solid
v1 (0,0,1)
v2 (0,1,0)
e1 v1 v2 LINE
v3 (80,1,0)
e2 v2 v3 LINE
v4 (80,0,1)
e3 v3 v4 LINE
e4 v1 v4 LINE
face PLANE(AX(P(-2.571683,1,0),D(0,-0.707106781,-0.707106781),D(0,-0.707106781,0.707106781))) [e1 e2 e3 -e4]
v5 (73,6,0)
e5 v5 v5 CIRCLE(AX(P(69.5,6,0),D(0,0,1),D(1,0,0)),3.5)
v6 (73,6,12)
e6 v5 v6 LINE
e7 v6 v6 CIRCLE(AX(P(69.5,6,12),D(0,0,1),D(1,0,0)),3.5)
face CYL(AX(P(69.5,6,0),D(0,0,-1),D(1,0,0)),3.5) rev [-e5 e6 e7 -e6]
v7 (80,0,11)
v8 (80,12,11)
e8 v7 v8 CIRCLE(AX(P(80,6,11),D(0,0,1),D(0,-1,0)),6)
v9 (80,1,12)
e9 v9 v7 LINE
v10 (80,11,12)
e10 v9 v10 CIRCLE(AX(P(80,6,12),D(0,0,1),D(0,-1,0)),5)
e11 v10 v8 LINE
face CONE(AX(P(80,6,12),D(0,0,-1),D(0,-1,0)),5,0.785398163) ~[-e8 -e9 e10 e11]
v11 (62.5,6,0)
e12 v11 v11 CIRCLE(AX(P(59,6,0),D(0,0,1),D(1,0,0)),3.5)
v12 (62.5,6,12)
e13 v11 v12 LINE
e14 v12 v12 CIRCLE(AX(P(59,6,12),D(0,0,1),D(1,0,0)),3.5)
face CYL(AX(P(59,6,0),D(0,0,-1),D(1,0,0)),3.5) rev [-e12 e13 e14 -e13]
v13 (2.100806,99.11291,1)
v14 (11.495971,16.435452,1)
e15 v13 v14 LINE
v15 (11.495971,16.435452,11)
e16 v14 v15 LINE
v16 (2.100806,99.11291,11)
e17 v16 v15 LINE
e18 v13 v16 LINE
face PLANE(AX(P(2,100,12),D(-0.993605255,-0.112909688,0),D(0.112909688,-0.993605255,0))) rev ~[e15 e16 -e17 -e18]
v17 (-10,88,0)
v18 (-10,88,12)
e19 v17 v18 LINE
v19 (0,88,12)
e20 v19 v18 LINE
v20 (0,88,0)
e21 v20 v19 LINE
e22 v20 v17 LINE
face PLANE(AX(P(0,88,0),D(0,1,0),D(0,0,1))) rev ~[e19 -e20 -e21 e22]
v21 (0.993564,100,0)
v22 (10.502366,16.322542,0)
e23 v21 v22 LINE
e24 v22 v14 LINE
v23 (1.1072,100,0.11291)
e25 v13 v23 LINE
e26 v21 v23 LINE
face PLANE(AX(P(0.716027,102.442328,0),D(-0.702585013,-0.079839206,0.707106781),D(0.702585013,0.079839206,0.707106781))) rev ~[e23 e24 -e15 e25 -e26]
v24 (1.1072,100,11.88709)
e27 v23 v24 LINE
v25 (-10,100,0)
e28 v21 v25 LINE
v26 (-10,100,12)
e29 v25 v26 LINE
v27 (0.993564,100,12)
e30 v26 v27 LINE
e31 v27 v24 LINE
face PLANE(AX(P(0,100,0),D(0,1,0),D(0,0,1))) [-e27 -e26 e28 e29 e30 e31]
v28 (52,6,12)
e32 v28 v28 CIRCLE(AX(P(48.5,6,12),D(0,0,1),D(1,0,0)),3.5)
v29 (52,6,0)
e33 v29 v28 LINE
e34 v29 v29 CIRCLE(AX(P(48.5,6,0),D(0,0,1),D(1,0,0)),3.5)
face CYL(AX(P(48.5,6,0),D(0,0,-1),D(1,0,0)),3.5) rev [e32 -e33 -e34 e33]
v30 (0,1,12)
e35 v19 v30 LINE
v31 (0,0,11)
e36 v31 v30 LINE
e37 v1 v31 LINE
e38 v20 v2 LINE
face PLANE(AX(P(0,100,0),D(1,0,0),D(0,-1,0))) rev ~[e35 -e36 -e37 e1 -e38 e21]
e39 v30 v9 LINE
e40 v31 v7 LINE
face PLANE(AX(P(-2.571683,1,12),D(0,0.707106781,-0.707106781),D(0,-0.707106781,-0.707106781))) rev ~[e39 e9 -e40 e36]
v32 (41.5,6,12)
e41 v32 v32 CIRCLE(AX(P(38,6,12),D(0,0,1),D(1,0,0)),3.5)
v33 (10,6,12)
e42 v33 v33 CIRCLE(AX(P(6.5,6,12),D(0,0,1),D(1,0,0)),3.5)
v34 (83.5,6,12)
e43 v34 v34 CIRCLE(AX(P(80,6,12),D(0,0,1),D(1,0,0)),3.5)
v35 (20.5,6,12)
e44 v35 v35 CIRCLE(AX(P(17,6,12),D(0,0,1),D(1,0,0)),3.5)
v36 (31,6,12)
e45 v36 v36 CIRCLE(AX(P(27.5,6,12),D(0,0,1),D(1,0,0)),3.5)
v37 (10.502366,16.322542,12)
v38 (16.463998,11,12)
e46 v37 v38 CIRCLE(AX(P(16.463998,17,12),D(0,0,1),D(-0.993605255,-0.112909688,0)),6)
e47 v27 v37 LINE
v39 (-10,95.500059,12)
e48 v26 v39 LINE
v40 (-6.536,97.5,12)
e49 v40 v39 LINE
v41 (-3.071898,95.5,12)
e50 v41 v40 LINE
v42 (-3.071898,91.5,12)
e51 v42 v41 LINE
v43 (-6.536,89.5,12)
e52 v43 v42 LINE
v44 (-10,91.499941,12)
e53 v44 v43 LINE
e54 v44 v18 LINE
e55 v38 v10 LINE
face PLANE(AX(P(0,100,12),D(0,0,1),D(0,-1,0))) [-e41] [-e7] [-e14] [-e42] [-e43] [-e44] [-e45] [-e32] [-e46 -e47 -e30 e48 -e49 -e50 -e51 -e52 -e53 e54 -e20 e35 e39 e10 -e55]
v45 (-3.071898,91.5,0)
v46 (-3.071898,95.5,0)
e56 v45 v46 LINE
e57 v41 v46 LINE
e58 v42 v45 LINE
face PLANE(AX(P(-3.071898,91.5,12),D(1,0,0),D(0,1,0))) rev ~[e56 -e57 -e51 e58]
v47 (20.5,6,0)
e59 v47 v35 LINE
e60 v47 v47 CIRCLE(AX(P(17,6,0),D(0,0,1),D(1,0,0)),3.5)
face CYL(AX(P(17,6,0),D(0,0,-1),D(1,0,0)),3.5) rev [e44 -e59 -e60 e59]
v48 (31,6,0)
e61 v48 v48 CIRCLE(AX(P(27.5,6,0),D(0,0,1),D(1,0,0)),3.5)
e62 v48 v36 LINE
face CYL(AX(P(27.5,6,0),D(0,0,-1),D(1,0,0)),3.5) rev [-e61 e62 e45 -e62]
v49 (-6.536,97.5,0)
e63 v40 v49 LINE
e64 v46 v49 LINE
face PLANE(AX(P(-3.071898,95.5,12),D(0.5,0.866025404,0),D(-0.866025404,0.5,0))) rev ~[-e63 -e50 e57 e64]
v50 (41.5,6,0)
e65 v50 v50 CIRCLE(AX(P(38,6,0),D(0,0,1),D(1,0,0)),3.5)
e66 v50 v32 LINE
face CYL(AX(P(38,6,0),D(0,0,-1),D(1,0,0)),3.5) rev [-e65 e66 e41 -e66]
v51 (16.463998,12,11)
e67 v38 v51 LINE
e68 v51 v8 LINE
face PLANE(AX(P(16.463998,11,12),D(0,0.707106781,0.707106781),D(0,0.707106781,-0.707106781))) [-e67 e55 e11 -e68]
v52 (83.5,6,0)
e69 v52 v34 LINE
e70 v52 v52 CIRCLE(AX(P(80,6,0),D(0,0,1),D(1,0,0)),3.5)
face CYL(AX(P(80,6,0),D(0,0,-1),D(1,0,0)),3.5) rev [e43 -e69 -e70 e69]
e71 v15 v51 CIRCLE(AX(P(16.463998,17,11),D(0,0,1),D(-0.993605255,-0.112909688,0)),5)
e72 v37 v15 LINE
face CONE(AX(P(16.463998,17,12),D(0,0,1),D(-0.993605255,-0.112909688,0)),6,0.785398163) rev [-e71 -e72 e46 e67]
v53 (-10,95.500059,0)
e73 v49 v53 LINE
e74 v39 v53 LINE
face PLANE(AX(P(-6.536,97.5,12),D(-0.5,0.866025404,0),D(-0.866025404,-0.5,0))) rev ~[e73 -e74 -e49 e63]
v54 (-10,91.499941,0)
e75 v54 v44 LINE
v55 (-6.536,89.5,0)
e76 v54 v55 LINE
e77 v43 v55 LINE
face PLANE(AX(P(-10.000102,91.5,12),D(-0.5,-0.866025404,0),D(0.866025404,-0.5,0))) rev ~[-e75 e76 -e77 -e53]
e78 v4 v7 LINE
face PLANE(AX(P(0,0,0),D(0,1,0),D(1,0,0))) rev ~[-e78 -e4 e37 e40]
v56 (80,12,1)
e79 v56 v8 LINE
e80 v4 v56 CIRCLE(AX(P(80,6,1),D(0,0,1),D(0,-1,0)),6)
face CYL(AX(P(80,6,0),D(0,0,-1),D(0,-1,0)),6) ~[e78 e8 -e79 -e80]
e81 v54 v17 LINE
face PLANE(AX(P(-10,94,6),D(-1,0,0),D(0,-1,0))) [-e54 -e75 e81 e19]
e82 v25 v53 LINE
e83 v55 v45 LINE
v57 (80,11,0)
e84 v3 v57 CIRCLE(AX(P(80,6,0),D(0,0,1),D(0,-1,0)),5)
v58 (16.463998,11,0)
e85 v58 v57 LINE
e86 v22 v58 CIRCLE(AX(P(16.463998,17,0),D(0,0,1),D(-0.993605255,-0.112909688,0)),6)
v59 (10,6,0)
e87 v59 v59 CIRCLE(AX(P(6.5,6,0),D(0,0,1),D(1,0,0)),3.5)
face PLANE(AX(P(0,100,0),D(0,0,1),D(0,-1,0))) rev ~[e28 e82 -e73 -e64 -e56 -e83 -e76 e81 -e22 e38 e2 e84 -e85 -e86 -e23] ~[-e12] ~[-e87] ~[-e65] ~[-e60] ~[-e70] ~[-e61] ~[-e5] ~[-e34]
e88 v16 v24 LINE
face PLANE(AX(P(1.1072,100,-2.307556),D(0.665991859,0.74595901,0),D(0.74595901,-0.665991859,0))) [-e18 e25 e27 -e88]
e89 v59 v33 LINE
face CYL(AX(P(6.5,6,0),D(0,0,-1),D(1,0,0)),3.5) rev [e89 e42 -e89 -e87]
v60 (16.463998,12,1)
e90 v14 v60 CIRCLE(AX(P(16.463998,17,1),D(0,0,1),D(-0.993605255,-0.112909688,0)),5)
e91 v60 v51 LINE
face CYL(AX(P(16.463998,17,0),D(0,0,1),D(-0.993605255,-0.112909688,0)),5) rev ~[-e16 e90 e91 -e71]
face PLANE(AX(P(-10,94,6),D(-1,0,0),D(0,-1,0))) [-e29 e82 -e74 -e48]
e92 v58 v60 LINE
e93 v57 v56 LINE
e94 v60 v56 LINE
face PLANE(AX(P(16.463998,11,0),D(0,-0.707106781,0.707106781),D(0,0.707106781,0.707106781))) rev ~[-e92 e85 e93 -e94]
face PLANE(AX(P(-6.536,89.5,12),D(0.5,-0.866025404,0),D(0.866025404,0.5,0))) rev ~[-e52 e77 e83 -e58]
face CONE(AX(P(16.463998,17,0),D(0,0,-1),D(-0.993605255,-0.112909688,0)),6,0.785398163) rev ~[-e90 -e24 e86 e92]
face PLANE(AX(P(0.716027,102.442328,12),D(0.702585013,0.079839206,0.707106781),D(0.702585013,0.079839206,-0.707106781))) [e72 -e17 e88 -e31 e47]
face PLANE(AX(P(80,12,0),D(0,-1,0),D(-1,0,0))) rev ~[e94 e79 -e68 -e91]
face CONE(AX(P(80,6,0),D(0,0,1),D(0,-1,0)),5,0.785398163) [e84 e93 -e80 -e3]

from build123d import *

# Parameters (mm, degrees)
F0_R         = 3.5
F1_DEPTH     = 12
F3_DEPTH     = 25
F4_R         = 5
F5_W         = 12
F5_H         = 12
F6_DEPTH     = 10
F8_T1_DEPTH  = 86.6740446023
F8_T3_DEPTH  = 16.6151120325
F8_T5_DEPTH  = 82.571682988
F8_T7_DEPTH  = 63.5360023124
F8_T10_ANGLE = 180
F8_T12_ANGLE = 83.5169263071
F8_T14_ANGLE = 180
F8_T16_ANGLE = 83.5169263071
F9_DEPTH     = 25


# Not quite as in the source:
# - a fillet or chamfer that OpenCascade refuses, or shapes differently, is made with other operations: its cross-section is extruded or revolved along the edge and cut away or added


with BuildPart() as f1:
    # F0 (on Top) → F1 (new body)
    with BuildSketch(Plane.XY):
        with BuildLine():
            Line((12, 100), (0, 100))
            Line((0, 100), (0, 0))
            Line((0, 0), (80, 0))
            ThreePointArc((80, 0), (86, 6), (80, 12))
            Line((80, 12), (12, 12))
            Line((12, 12), (12, 100))
        make_face()
        with Locations((6.5, 6)):
            Circle(F0_R, mode=Mode.SUBTRACT)
        with Locations((17, 6)):
            Circle(F0_R, mode=Mode.SUBTRACT)
        with Locations((27.5, 6)):
            Circle(F0_R, mode=Mode.SUBTRACT)
        with Locations((38, 6)):
            Circle(F0_R, mode=Mode.SUBTRACT)
        with Locations((48.5, 6)):
            Circle(F0_R, mode=Mode.SUBTRACT)
        with Locations((59, 6)):
            Circle(F0_R, mode=Mode.SUBTRACT)
        with Locations((69.5, 6)):
            Circle(F0_R, mode=Mode.SUBTRACT)
        with Locations((80, 6)):
            Circle(F0_R, mode=Mode.SUBTRACT)
    extrude(amount=F1_DEPTH)

    # F2 (on face) → F3 (cut)
    with BuildSketch(Plane.XY.offset(12)):
        Polygon((2, 100), (12, 12), (12, 100), align=None)
    extrude(amount=-F3_DEPTH, mode=Mode.SUBTRACT)

    # F4
    f4_edges = [f1.edges().sort_by_distance(p)[0] for p in [
        (12, 12, 6),
    ]]
    fillet(f4_edges, radius=F4_R)

    # F5 (on face) → F6 (join)
    with BuildSketch(Plane(origin=(0, 0, 0), x_dir=(0, -1, 0), z_dir=(-1, 0, 0))):
        with Locations((-94, 6)):
            Rectangle(F5_W, F5_H)
    extrude(amount=F6_DEPTH)

    # F8: chamfer of 1 on 11 edges, made by hand

    # F8_s2 → F8_t1 (cut)
    with BuildSketch(Plane(origin=(-11.4836366644, 101.0560026464, 0), x_dir=(0, 0, 1), z_dir=(0.112909688, -0.9936052548, 0))):
        Polygon((12, -12.278179314), (11, -13.278179314), (12, -13.278179314), align=None)
        Polygon((0, -12.278179314), (1, -13.278179314), (0, -13.278179314), align=None)
    extrude(amount=F8_T1_DEPTH, mode=Mode.SUBTRACT)

    # F8_s4 → F8_t3 (cut)
    with BuildSketch(Plane.XY.offset(-2.3075560163)):
        Polygon((1.1072004625, 100), (2.1008057173, 99.112909688), (2, 100), align=None)
    extrude(amount=F8_T3_DEPTH, mode=Mode.SUBTRACT)

    # F8_s6 → F8_t5 (cut)
    with BuildSketch(Plane.YZ.offset(-2.571682988)):
        Polygon((1, 0), (0, 1), (0, 0), align=None)
        Polygon((1, 12), (0, 11), (0, 12), align=None)
    extrude(amount=F8_T5_DEPTH, mode=Mode.SUBTRACT)

    # F8_s8 → F8_t7 (cut)
    with BuildSketch(Plane.YZ.offset(16.4639976876)):
        Polygon((11, 0), (12, 1), (12, 0), align=None)
        Polygon((11, 12), (12, 11), (12, 12), align=None)
    extrude(amount=F8_T7_DEPTH, mode=Mode.SUBTRACT)

    # F8_s9 → F8_t10 (revolve, cut)
    with BuildSketch(Plane.YZ.offset(80)):
        Polygon((1, 0), (0, 1), (0, 0), align=None)
    revolve(axis=Axis((80, 6, 0), (0, 0, 1)), revolution_arc=F8_T10_ANGLE, mode=Mode.SUBTRACT)

    # F8_s11 → F8_t12 (revolve, cut)
    with BuildSketch(Plane(origin=(-1.6972973268, 14.9362164756, 0), x_dir=(0, 0, 1), z_dir=(-0.112909688, 0.9936052548, 0))):
        Polygon((0, 12.278179314), (1, 13.278179314), (0, 13.278179314), align=None)
    revolve(axis=Axis((16.4639976876, 17, 0), (0, 0, 1)), revolution_arc=F8_T12_ANGLE, mode=Mode.SUBTRACT)

    # F8_s13 → F8_t14 (revolve, cut)
    with BuildSketch(Plane.YZ.offset(80)):
        Polygon((1, 12), (0, 11), (0, 12), align=None)
    revolve(axis=Axis((80, 6, 12), (0, 0, 1)), revolution_arc=F8_T14_ANGLE, mode=Mode.SUBTRACT)

    # F8_s15 → F8_t16 (revolve, cut)
    with BuildSketch(Plane(origin=(-1.6972973268, 14.9362164756, 0), x_dir=(0, 0, 1), z_dir=(-0.112909688, 0.9936052548, 0))):
        Polygon((12, 12.278179314), (11, 13.278179314), (12, 13.278179314), align=None)
    revolve(axis=Axis((16.4639976876, 17, 12), (0, 0, 1)), revolution_arc=F8_T16_ANGLE, mode=Mode.SUBTRACT)

    # F7 (on face) → F9 (cut)
    with BuildSketch(Plane.XY.offset(12)):
        Polygon((150.627374606, 89.5), (150.627374606, 97.5), (143.6991713757, 101.5), (136.7709681454, 97.5), (136.7709681454, 89.5), (143.6991713757, 85.5), align=None)
        Polygon((-6.536, 89.5), (-3.0718983849, 91.5), (-3.0718983849, 95.5), (-6.536, 97.5), (-10.0001016151, 95.5), (-10.0001016151, 91.5), align=None)
    extrude(amount=-F9_DEPTH, mode=Mode.SUBTRACT)


solid = f1.part
